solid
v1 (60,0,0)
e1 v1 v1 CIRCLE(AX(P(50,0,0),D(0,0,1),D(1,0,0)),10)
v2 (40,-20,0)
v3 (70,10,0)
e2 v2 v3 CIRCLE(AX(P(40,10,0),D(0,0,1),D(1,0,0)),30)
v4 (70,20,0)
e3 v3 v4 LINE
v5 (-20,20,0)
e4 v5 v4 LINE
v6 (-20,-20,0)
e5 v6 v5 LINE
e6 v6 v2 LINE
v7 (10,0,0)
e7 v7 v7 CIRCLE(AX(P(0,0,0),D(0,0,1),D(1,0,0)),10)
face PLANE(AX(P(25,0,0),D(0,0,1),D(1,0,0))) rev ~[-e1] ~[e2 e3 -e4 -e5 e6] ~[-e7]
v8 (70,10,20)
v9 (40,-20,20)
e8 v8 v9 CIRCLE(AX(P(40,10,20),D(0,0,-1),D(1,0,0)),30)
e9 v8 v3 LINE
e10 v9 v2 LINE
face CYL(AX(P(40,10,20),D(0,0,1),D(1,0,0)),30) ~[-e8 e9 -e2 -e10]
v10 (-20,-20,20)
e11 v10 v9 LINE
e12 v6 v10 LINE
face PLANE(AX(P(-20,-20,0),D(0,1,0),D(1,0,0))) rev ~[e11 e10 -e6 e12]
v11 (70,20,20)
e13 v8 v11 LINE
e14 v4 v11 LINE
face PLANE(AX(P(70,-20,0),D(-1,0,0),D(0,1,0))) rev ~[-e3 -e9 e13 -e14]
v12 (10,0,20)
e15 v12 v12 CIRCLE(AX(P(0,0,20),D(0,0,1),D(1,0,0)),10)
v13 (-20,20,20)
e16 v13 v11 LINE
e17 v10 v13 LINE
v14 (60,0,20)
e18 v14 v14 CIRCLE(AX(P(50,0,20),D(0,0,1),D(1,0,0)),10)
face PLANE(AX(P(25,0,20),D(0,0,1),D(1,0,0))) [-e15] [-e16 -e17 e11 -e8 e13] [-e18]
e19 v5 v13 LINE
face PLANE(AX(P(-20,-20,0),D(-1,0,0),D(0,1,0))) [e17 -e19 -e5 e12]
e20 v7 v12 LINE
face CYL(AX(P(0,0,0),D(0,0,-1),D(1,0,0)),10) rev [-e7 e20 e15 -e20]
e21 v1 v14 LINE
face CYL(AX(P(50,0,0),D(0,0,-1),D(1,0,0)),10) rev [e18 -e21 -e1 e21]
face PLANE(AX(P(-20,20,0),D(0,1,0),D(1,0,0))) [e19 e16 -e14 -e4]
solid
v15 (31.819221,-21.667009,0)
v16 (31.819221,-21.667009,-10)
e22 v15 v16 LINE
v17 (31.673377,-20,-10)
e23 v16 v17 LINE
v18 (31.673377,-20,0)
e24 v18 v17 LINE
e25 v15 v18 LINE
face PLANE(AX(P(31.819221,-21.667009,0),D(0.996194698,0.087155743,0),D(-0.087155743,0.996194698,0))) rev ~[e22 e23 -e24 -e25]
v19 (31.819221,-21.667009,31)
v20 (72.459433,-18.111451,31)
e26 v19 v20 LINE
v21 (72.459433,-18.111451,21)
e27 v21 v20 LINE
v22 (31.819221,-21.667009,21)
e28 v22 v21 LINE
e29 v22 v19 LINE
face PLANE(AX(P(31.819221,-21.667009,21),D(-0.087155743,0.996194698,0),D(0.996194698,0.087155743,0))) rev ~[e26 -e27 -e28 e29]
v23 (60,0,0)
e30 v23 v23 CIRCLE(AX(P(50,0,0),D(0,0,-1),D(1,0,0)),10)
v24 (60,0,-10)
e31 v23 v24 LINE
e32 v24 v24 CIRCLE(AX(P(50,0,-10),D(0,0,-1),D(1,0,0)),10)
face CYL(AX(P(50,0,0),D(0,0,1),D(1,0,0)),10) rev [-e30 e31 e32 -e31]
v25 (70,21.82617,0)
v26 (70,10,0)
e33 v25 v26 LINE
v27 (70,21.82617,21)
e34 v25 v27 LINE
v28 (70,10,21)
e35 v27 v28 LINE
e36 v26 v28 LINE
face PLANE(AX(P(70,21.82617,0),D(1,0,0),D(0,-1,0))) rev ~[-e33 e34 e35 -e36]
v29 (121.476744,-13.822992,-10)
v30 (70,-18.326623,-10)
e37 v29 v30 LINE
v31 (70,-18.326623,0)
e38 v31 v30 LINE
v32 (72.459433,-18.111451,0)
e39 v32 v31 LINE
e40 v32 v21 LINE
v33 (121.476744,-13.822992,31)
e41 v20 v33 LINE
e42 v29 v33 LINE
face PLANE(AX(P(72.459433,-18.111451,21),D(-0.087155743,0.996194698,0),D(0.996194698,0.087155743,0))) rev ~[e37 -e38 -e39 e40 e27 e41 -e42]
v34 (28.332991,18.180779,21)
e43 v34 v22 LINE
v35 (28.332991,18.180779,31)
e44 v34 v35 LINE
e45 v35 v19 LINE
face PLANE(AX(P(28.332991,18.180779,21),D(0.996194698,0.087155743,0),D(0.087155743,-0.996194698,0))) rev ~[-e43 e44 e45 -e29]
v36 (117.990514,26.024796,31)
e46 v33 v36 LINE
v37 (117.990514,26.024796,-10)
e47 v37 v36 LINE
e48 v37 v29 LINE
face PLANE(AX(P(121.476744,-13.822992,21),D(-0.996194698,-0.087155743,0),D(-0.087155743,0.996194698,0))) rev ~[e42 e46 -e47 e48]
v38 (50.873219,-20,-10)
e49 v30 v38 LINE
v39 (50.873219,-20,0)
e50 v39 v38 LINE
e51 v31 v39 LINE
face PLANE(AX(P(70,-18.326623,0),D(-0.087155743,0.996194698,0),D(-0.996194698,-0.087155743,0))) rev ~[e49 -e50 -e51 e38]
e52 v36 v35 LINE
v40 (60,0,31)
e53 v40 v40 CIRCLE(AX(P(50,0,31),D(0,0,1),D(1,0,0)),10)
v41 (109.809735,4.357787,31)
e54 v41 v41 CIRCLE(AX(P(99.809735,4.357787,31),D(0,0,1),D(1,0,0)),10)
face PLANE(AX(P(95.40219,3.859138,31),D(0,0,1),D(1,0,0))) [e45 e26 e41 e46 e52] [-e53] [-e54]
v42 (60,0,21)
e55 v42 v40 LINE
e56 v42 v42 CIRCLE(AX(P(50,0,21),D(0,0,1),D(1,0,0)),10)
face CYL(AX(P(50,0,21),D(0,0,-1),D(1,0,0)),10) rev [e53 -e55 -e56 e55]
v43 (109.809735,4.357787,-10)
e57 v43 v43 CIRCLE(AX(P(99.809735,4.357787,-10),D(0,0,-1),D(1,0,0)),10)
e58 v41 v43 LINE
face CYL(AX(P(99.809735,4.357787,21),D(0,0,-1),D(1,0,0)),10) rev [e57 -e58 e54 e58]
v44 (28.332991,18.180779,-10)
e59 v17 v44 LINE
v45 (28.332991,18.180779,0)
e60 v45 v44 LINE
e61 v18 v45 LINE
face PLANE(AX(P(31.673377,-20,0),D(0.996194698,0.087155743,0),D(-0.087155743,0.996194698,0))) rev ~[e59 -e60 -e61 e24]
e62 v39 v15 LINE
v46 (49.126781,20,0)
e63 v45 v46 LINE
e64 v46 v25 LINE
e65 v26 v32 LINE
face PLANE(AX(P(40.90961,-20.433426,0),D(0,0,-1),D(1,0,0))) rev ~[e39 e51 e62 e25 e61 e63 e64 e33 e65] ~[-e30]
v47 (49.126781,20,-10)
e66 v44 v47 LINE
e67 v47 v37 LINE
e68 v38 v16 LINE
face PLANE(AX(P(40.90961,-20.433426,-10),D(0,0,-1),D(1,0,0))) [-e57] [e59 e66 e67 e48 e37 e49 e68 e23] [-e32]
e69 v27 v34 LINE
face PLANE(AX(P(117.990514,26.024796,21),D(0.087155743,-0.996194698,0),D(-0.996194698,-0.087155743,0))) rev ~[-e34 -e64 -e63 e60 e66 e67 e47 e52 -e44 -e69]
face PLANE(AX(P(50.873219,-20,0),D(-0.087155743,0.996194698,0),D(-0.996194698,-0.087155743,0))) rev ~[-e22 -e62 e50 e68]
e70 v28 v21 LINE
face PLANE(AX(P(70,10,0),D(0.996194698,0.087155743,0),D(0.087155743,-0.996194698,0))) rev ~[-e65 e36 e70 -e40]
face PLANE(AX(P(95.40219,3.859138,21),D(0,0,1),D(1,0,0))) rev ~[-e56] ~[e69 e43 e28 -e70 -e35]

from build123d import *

# Parameters (mm, degrees)
F0_W     = 90
F0_H     = 40
F0_R     = 10
F1_DEPTH = 20
F2_R     = 10
F3_DEPTH = 10
F5_DEPTH = 30.001
F6_R     = 10
F7_DEPTH = 21
F8_R     = 10
F9_DEPTH = 10


with BuildPart() as f1:
    # F0 (on Top) → F1 (new body)
    with BuildSketch(Plane.XY):
        with Locations((25, 0)):
            Rectangle(F0_W, F0_H)
        Circle(F0_R, mode=Mode.SUBTRACT)
        with Locations((50, 0)):
            Circle(F0_R, mode=Mode.SUBTRACT)
    extrude(amount=F1_DEPTH)

    # F4 (on face) → F5 (cut, through all)
    with BuildSketch(Plane.XY.offset(20)):
        with BuildLine():
            Line((70, -20), (70, 10))
            ThreePointArc((70, 10), (61.2132034356, -11.2132034356), (40, -20))
            Line((40, -20), (70, -20))
        make_face()
    extrude(amount=-F5_DEPTH, mode=Mode.SUBTRACT)


with BuildPart() as f3:
    # F2 (on face) → F3 (new body)
    with BuildSketch(Plane(origin=(0, 0, 0), x_dir=(1, 0, 0), z_dir=(0, 0, -1))):
        Polygon((50.8732188582, 20), (31.8192208931, 21.6670088168), (31.6733765197, 20), align=None)
        Polygon((70, 18.3266234803), (50.8732188582, 20), (31.6733765197, 20), (28.3329911832, -18.1807791069), (49.1267811418, -20), (70, -20), align=None)
        with Locations((50, 0)):
            Circle(F2_R, mode=Mode.SUBTRACT)
        Polygon((121.4767437214, 13.8229919695), (70, 18.3266234803), (70, -20), (49.1267811418, -20), (117.9905140115, -26.0247959542), align=None)
        with Locations((99.8097349046, -4.3577871374)):
            Circle(F2_R, mode=Mode.SUBTRACT)
    extrude(amount=F3_DEPTH)

    # F6 (on face) → F7 (join)
    with BuildSketch(Plane.XY):
        Polygon((70, 21.8261700214), (70, 20), (70, 10), (72.4594332734, -18.1114509502), (121.4767437214, -13.8229919695), (117.9905140115, 26.0247959542), align=None)
        with Locations((99.8097349046, 4.3577871374)):
            Circle(F6_R, mode=Mode.SUBTRACT)
    extrude(amount=F7_DEPTH)

    # F8 (on face) → F9 (join)
    with BuildSketch(Plane.XY.offset(21)):
        Polygon((70, 10), (72.4594332734, -18.1114509502), (121.4767437214, -13.8229919695), (117.9905140115, 26.0247959542), (70, 21.8261700214), align=None)
        with Locations((99.8097349046, 4.3577871374)):
            Circle(F8_R, mode=Mode.SUBTRACT)
        Polygon((28.3329911832, 18.1807791069), (31.8192208931, -21.6670088168), (72.4594332734, -18.1114509502), (70, 10), (70, 21.8261700214), align=None)
        with Locations((50, 0)):
            Circle(F8_R, mode=Mode.SUBTRACT)
    extrude(amount=F9_DEPTH)


solid = Compound([f1.part, f3.part])
